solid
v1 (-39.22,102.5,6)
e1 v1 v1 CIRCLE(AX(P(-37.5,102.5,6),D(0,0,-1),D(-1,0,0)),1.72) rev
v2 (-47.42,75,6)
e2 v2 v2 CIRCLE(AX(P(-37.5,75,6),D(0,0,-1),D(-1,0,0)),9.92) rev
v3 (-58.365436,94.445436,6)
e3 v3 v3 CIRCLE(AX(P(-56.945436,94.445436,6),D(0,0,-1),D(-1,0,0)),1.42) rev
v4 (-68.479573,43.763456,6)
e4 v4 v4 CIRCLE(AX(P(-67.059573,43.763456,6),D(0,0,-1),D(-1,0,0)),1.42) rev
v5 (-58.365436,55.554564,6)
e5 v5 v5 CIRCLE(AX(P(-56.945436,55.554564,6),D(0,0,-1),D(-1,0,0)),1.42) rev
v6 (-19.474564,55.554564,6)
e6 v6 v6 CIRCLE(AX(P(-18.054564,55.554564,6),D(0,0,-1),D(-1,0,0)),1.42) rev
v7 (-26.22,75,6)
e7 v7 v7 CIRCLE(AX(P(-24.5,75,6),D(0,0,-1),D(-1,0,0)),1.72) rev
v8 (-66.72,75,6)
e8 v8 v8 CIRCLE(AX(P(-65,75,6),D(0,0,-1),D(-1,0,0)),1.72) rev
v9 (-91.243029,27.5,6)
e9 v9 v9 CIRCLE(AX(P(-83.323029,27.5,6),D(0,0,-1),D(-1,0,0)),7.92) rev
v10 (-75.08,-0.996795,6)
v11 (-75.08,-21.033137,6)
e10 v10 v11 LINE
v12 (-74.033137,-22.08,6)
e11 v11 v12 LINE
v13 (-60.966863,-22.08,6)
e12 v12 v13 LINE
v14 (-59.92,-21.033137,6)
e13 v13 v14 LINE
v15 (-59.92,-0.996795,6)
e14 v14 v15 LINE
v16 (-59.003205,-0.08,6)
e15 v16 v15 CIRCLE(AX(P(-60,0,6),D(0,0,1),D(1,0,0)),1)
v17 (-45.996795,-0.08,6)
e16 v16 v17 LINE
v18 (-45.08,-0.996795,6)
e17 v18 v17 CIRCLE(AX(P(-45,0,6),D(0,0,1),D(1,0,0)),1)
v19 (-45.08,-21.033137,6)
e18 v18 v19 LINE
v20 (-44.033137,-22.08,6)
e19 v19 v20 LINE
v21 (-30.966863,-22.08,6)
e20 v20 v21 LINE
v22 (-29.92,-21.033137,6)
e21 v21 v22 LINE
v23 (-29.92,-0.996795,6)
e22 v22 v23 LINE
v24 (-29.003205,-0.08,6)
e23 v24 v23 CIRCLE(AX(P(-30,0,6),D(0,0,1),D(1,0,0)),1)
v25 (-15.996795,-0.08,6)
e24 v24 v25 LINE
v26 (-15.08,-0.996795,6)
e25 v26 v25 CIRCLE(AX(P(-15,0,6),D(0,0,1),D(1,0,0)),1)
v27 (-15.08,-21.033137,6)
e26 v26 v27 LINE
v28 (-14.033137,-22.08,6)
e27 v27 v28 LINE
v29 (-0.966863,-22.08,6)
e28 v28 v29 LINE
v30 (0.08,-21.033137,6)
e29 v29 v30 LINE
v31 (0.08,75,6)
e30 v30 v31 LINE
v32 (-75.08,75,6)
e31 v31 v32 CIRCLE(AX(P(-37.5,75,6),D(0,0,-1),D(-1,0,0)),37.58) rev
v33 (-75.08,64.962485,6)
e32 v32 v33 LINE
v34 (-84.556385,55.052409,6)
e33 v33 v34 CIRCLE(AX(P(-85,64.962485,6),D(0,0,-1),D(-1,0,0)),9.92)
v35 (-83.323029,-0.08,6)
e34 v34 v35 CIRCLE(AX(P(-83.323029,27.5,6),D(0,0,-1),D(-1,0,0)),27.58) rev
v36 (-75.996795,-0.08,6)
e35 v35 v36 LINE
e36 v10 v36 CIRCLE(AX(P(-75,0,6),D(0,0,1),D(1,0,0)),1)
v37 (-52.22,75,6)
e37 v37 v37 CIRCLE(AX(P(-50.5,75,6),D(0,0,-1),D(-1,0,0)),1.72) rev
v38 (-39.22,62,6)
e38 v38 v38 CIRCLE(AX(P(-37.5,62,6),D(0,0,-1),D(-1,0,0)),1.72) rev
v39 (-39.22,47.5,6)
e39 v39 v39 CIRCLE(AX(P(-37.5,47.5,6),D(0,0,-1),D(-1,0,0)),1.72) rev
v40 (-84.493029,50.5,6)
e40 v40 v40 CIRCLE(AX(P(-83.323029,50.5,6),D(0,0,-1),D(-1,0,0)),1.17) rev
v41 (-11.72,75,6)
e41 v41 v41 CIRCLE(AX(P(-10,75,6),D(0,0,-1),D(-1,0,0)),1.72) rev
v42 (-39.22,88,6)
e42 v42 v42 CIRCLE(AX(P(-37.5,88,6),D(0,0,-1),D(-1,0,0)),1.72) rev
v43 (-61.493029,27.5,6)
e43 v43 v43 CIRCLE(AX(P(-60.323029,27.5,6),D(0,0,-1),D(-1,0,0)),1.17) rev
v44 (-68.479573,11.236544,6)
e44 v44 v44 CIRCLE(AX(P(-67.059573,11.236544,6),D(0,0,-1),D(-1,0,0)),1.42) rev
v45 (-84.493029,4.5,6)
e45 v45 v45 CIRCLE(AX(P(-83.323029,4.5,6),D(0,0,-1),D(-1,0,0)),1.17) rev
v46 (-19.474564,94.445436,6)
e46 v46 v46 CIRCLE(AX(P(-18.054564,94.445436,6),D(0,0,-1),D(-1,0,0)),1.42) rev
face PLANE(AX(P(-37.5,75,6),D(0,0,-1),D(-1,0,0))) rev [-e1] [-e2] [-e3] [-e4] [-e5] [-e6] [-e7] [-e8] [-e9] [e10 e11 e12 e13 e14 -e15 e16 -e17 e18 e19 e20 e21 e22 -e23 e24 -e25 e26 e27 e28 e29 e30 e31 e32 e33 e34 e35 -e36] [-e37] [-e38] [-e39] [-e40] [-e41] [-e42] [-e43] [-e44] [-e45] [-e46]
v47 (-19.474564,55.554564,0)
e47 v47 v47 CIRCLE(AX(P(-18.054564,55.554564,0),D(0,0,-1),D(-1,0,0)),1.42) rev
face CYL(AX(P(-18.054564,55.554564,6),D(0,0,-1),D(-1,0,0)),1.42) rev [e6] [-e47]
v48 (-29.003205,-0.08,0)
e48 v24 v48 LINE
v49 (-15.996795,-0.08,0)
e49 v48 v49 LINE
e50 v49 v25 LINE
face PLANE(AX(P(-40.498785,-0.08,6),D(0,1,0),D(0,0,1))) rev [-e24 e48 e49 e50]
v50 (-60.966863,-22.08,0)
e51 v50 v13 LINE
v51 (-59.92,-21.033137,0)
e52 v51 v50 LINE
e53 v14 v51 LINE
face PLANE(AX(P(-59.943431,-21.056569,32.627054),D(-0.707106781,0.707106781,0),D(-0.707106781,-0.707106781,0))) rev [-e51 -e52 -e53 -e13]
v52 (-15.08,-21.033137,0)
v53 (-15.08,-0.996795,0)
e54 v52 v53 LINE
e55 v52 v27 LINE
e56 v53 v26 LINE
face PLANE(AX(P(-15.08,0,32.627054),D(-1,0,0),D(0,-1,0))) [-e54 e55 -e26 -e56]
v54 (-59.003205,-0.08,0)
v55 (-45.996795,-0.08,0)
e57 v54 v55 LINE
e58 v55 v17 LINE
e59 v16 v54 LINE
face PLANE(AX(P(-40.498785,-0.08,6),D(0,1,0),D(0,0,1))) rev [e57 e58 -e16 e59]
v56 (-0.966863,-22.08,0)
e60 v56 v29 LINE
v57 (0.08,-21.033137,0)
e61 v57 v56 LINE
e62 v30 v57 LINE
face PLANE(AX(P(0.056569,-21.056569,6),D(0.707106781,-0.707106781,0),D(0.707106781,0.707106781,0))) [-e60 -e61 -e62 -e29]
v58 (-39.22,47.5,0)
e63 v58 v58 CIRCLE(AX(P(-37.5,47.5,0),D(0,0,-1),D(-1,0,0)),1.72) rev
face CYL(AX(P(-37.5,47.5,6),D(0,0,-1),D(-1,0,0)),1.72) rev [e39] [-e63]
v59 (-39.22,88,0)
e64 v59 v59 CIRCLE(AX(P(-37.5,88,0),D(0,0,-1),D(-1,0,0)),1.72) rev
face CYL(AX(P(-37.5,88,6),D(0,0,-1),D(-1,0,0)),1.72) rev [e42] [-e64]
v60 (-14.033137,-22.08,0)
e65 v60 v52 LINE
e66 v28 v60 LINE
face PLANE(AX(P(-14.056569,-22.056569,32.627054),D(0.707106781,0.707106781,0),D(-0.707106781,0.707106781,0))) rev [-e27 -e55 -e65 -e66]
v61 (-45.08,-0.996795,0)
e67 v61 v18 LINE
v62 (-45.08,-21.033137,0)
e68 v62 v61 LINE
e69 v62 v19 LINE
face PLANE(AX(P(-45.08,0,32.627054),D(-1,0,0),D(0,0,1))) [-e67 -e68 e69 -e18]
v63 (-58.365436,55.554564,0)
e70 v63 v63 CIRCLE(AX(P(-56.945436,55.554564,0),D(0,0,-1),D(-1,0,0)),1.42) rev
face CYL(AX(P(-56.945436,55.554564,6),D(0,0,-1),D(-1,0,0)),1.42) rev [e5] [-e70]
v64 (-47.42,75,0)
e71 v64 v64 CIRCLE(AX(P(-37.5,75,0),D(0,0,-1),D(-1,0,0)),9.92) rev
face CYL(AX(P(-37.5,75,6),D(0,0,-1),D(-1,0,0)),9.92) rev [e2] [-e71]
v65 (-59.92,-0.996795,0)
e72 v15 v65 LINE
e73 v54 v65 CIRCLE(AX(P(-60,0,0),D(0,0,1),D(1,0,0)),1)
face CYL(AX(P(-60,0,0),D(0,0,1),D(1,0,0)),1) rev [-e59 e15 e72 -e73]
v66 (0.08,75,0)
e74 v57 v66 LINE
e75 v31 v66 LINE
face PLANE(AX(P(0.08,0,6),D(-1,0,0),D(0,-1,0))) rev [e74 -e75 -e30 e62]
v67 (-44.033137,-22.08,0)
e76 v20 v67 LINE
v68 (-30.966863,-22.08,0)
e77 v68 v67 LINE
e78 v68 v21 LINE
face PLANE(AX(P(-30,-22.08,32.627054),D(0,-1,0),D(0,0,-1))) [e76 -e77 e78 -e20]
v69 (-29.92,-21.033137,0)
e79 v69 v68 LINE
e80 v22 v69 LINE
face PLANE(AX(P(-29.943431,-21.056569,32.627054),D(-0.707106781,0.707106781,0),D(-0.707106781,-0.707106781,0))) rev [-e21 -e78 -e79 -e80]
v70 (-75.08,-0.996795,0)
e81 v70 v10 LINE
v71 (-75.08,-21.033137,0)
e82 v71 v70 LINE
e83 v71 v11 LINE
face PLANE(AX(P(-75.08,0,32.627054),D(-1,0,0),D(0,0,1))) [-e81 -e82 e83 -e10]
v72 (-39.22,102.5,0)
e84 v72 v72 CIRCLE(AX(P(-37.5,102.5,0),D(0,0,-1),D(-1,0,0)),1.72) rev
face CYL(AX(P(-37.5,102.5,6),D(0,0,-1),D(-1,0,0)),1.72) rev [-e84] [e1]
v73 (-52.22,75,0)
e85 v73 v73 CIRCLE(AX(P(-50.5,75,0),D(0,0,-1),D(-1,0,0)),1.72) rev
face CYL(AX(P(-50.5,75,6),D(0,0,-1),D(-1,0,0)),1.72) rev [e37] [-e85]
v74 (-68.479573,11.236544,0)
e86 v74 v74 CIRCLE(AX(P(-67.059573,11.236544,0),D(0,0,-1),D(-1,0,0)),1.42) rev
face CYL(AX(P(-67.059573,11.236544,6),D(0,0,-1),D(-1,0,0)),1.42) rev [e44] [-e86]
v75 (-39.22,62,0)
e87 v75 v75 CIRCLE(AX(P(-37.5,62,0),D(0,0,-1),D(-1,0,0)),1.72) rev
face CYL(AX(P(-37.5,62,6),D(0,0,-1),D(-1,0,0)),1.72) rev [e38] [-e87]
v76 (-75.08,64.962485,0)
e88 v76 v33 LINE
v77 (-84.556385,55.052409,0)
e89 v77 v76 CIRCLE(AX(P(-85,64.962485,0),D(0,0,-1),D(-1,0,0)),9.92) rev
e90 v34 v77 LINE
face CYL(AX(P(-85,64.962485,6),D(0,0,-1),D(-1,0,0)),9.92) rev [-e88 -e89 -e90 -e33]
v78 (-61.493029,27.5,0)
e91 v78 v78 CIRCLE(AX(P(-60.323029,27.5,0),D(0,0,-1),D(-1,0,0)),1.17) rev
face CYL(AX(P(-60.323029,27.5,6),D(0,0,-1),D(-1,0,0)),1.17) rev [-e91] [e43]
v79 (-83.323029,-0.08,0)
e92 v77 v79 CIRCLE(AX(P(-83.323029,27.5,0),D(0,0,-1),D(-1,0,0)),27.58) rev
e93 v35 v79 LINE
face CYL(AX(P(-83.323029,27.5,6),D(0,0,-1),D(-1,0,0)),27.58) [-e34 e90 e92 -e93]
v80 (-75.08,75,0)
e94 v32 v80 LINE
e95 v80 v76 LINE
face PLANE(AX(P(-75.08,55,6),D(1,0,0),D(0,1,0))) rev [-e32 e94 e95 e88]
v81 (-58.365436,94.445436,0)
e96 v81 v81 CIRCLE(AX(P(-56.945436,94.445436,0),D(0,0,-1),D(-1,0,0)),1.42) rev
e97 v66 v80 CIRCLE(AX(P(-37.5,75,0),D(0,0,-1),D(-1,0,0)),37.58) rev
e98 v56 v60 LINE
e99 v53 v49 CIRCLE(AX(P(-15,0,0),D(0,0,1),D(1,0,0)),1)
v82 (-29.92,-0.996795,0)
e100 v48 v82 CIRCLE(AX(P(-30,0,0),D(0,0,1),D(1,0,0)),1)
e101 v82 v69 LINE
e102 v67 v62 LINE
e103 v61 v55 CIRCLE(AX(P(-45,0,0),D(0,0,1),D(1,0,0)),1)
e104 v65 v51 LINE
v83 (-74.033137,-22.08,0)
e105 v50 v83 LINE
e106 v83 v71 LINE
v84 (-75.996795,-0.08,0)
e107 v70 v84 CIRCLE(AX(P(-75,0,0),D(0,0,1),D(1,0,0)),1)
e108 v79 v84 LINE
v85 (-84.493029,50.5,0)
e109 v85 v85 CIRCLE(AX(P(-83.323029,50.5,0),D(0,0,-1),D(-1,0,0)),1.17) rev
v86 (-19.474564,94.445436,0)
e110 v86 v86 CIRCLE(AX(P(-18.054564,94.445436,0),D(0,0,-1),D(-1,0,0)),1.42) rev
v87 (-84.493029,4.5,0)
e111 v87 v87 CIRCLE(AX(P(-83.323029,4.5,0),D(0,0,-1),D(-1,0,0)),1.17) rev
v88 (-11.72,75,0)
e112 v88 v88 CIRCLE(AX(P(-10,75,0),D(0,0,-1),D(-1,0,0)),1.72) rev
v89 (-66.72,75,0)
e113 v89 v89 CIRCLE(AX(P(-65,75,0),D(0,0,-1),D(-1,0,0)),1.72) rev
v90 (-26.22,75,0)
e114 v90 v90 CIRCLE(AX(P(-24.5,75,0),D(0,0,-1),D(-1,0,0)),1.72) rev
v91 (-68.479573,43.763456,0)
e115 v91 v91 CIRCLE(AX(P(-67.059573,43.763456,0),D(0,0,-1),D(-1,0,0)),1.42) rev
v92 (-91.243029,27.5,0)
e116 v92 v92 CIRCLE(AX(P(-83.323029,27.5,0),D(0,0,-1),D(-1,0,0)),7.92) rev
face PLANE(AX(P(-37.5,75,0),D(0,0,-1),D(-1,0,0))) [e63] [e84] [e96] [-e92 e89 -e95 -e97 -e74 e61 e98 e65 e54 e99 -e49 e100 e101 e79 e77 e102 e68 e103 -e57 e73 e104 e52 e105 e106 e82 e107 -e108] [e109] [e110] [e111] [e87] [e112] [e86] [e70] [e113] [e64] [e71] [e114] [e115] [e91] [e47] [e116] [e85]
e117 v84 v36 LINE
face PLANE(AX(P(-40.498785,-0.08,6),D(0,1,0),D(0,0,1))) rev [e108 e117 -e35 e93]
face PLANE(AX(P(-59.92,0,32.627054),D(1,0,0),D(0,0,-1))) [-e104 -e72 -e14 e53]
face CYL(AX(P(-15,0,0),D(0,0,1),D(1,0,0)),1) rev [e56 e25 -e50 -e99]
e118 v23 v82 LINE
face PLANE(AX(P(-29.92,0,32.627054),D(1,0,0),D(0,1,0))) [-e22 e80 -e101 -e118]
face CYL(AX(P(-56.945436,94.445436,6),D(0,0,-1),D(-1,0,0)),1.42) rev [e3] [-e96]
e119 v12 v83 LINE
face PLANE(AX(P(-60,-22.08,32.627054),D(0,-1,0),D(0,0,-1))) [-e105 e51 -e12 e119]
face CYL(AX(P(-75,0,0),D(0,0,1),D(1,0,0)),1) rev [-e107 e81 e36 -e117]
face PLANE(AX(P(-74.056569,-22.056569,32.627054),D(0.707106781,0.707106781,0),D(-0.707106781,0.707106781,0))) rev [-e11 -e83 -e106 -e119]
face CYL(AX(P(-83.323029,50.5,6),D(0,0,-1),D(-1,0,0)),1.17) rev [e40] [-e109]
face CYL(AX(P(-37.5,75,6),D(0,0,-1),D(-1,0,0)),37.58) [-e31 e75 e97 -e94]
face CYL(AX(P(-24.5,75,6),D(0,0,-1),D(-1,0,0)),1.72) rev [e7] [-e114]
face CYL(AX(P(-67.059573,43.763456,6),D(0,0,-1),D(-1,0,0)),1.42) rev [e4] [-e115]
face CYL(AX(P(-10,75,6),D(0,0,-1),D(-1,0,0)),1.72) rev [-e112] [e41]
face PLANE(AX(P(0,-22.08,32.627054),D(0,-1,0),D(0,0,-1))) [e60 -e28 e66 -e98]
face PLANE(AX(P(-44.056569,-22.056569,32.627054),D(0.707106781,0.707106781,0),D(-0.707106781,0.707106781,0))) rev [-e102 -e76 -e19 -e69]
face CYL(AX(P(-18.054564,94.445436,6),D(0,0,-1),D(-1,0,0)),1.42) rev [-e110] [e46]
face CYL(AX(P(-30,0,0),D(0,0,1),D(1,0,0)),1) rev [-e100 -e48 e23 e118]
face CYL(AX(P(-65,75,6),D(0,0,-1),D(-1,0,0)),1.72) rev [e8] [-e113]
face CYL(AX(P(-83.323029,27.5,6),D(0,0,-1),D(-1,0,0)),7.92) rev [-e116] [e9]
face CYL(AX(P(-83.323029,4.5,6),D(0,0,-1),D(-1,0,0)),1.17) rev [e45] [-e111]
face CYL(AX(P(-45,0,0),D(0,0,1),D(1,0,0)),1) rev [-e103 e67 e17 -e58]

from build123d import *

# Parameters (mm, degrees)
SKETCH1_R               = 8
SKETCH1_R_2             = 10
SKETCH1_R_3             = 1.25
SKETCH1_R_4             = 1.5
SKETCH1_R_5             = 1.8
BOSS_EXTRUDE1_DEPTH     = 6
FILLET1_R               = 10
SKETCH2_W               = 15
SKETCH2_H               = 22
BOSS_EXTRUDE2_DEPTH     = 6
SKETCH3_R               = 1
CUT_EXTRUDE1_DEPTH      = 159.031622895
CHAMFER1_SIZE           = 1
MOVE_FACE1_OUTLINE_R    = 8
MOVE_FACE1_OUTLINE_R_2  = 7.92
MOVE_FACE1_OUTLINE_R_3  = 10
MOVE_FACE1_OUTLINE_R_4  = 9.92
MOVE_FACE1_OUTLINE_R_5  = 1.25
MOVE_FACE1_OUTLINE_R_6  = 1.17
MOVE_FACE1_OUTLINE_R_7  = 1.5
MOVE_FACE1_OUTLINE_R_8  = 1.42
MOVE_FACE1_OUTLINE_R_9  = 1.8
MOVE_FACE1_OUTLINE_R_10 = 1.72
MOVE_FACE1_DEPTH        = 6


# Read off the part's stored shape, not the designer's step: Move Face1
with BuildPart() as part:
    # Sketch1 → Boss-Extrude1 (new body)
    with BuildSketch(Plane.XY):
        with BuildLine():
            Line((-40.498784978, 0), (0, 0))
            Line((0, 0), (0, 75))
            ThreePointArc((0, 75), (-37.5, 112.5), (-75, 75))
            Line((-75, 75), (-75, 55))
            Line((-75, 55), (-83.323029145, 55))
            ThreePointArc((-83.323029145, 55), (-110.823029145, 27.5), (-83.323029145, 0))
            Line((-83.323029145, 0), (-40.498784978, 0))
        make_face()
        with Locations((-83.323029145, 27.5)):
            Circle(SKETCH1_R, mode=Mode.SUBTRACT)
        with Locations((-37.5, 75)):
            Circle(SKETCH1_R_2, mode=Mode.SUBTRACT)
        with Locations((-83.323029145, 50.5)):
            Circle(SKETCH1_R_3, mode=Mode.SUBTRACT)
        with Locations((-67.059573177, 43.763455967)):
            Circle(SKETCH1_R_4, mode=Mode.SUBTRACT)
        with Locations((-60.323029145, 27.5)):
            Circle(SKETCH1_R_3, mode=Mode.SUBTRACT)
        with Locations((-67.059573177, 11.236544033)):
            Circle(SKETCH1_R_4, mode=Mode.SUBTRACT)
        with Locations((-83.323029145, 4.5)):
            Circle(SKETCH1_R_3, mode=Mode.SUBTRACT)
        with Locations((-37.5, 102.5)):
            Circle(SKETCH1_R_5, mode=Mode.SUBTRACT)
        with Locations((-65, 75)):
            Circle(SKETCH1_R_5, mode=Mode.SUBTRACT)
        with Locations((-10, 75)):
            Circle(SKETCH1_R_5, mode=Mode.SUBTRACT)
        with Locations((-37.5, 47.5)):
            Circle(SKETCH1_R_5, mode=Mode.SUBTRACT)
        with Locations((-56.945436483, 94.445436483)):
            Circle(SKETCH1_R_4, mode=Mode.SUBTRACT)
        with Locations((-18.054563517, 94.445436483)):
            Circle(SKETCH1_R_4, mode=Mode.SUBTRACT)
        with Locations((-18.054563517, 55.554563517)):
            Circle(SKETCH1_R_4, mode=Mode.SUBTRACT)
        with Locations((-56.945436483, 55.554563517)):
            Circle(SKETCH1_R_4, mode=Mode.SUBTRACT)
        with Locations((-37.5, 88)):
            Circle(SKETCH1_R_5, mode=Mode.SUBTRACT)
        with Locations((-24.5, 75)):
            Circle(SKETCH1_R_5, mode=Mode.SUBTRACT)
        with Locations((-37.5, 62)):
            Circle(SKETCH1_R_5, mode=Mode.SUBTRACT)
        with Locations((-50.5, 75)):
            Circle(SKETCH1_R_5, mode=Mode.SUBTRACT)
    extrude(amount=BOSS_EXTRUDE1_DEPTH)

    # Fillet1
    fillet1_edges = [part.edges().sort_by_distance(p)[0] for p in [
        (-75, 55, 3),
    ]]
    fillet(fillet1_edges, radius=FILLET1_R)

    # Sketch2 → Boss-Extrude2 (add)
    with BuildSketch(Plane(origin=(0, 0, 0), x_dir=(-1, 0, 0), z_dir=(0, 0, -1))):
        with Locations((7.5, -11)):
            Rectangle(SKETCH2_W, SKETCH2_H)
        with Locations((37.5, -11)):
            Rectangle(SKETCH2_W, SKETCH2_H)
        with Locations((67.5, -11)):
            Rectangle(SKETCH2_W, SKETCH2_H)
    extrude(amount=-BOSS_EXTRUDE2_DEPTH)

    # Sketch3 → Cut-Extrude1 (cut, through all)
    with BuildSketch(Plane.XY.offset(6)):
        with Locations((-75, 0)):
            Circle(SKETCH3_R)
        with Locations((-60, 0)):
            Circle(SKETCH3_R)
        with Locations((-45, 0)):
            Circle(SKETCH3_R)
        with Locations((-30, 0)):
            Circle(SKETCH3_R)
        with Locations((-15, 0)):
            Circle(SKETCH3_R)
    extrude(amount=-CUT_EXTRUDE1_DEPTH, mode=Mode.SUBTRACT)

    # Chamfer1
    chamfer1_edges = [part.edges().sort_by_distance(p)[0] for p in [
        (0, -22, 3),
        (-15, -22, 3),
        (-30, -22, 3),
        (-45, -22, 3),
        (-60, -22, 3),
        (-75, -22, 3),
    ]]
    chamfer(chamfer1_edges, length=CHAMFER1_SIZE)

    # Move Face1 outline → Move Face1 (add)
    # profile 1 of 24: a face of its own
    with BuildSketch(Plane.XY):
        with BuildLine():
            Line((-59.003205136, -0.08), (-45.996794864, -0.08))
            ThreePointArc((-45.996794864, -0.08), (-45.999198395, -0.04003209), (-46, 0))
            Line((-46, 0), (-59, 0))
            ThreePointArc((-59, 0), (-59.000801605, -0.04003209), (-59.003205136, -0.08))
        make_face()
    # profile 2 of 24: a face of its own
    with BuildSketch(Plane.XY):
        with BuildLine():
            Line((-45, -21), (-45, -1))
            ThreePointArc((-45, -1), (-45.04003209, -0.999198395), (-45.08, -0.996794864))
            Line((-45.08, -0.996794864), (-45.08, -21.033137085))
            Line((-45.08, -21.033137085), (-44.033137085, -22.08))
            Line((-44.033137085, -22.08), (-30.966862915, -22.08))
            Line((-30.966862915, -22.08), (-29.92, -21.033137085))
            Line((-29.92, -21.033137085), (-29.92, -0.996794864))
            ThreePointArc((-29.92, -0.996794864), (-29.95996791, -0.999198395), (-30, -1))
            Line((-30, -1), (-30, -21))
            Line((-30, -21), (-31, -22))
            Line((-31, -22), (-44, -22))
            Line((-44, -22), (-45, -21))
        make_face()
    # profile 3 of 24: a face of its own
    with BuildSketch(Plane.XY):
        with BuildLine():
            ThreePointArc((-59.92, -0.996794864), (-59.95996791, -0.999198395), (-60, -1))
            Line((-60, -1), (-60, -21))
            Line((-60, -21), (-61, -22))
            Line((-61, -22), (-74, -22))
            Line((-74, -22), (-75, -21))
            Line((-75, -21), (-75, -1))
            ThreePointArc((-75, -1), (-75.04003209, -0.999198395), (-75.08, -0.996794864))
            Line((-75.08, -0.996794864), (-75.08, -21.033137085))
            Line((-75.08, -21.033137085), (-74.033137085, -22.08))
            Line((-74.033137085, -22.08), (-60.966862915, -22.08))
            Line((-60.966862915, -22.08), (-59.92, -21.033137085))
            Line((-59.92, -21.033137085), (-59.92, -0.996794864))
        make_face()
    # profile 4 of 24: a face of its own
    with BuildSketch(Plane.XY):
        with BuildLine():
            Line((-16, 0), (-29, 0))
            ThreePointArc((-29, 0), (-29.000801605, -0.04003209), (-29.003205136, -0.08))
            Line((-29.003205136, -0.08), (-15.996794864, -0.08))
            ThreePointArc((-15.996794864, -0.08), (-15.999198395, -0.04003209), (-16, 0))
        make_face()
    # profile 5 of 24: a face of its own
    with BuildSketch(Plane.XY):
        with BuildLine():
            ThreePointArc((-75.996794864, -0.08), (-75.999198395, -0.04003209), (-76, 0))
            Line((-76, 0), (-83.323029145, 0))
            ThreePointArc((-83.323029145, 0), (-110.816150501, 26.884956844), (-84.552807772, 54.972488867))
            ThreePointArc((-84.552807772, 54.972488867), (-77.772555006, 58.051331596), (-75, 64.962484818))
            Line((-75, 64.962484818), (-75, 75))
            ThreePointArc((-75, 75), (-37.5, 112.5), (0, 75))
            Line((0, 75), (0, -21))
            Line((0, -21), (-1, -22))
            Line((-1, -22), (-14, -22))
            Line((-14, -22), (-15, -21))
            Line((-15, -21), (-15, -1))
            ThreePointArc((-15, -1), (-15.04003209, -0.999198395), (-15.08, -0.996794864))
            Line((-15.08, -0.996794864), (-15.08, -21.033137085))
            Line((-15.08, -21.033137085), (-14.033137085, -22.08))
            Line((-14.033137085, -22.08), (-0.966862915, -22.08))
            Line((-0.966862915, -22.08), (0.08, -21.033137085))
            Line((0.08, -21.033137085), (0.08, 75))
            ThreePointArc((0.08, 75), (-37.5, 112.58), (-75.08, 75))
            Line((-75.08, 75), (-75.08, 64.962484818))
            ThreePointArc((-75.08, 64.962484818), (-77.830374566, 58.106620822), (-84.55638531, 55.052408834))
            ThreePointArc((-84.55638531, 55.052408834), (-110.896130491, 26.883167628), (-83.323029145, -0.08))
            Line((-83.323029145, -0.08), (-75.996794864, -0.08))
        make_face()
    # profile 6 of 24: a face of its own
    with BuildSketch(Plane.XY):
        with Locations((-83.323029145, 27.5)):
            Circle(MOVE_FACE1_OUTLINE_R)
        with Locations((-83.323029145, 27.5)):
            Circle(MOVE_FACE1_OUTLINE_R_2, mode=Mode.SUBTRACT)
    # profile 7 of 24: a face of its own
    with BuildSketch(Plane.XY):
        with Locations((-37.5, 75)):
            Circle(MOVE_FACE1_OUTLINE_R_3)
        with Locations((-37.5, 75)):
            Circle(MOVE_FACE1_OUTLINE_R_4, mode=Mode.SUBTRACT)
    # profile 8 of 24: a face of its own
    with BuildSketch(Plane.XY):
        with Locations((-83.323029145, 50.5)):
            Circle(MOVE_FACE1_OUTLINE_R_5)
        with Locations((-83.323029145, 50.5)):
            Circle(MOVE_FACE1_OUTLINE_R_6, mode=Mode.SUBTRACT)
    # profile 9 of 24: a face of its own
    with BuildSketch(Plane.XY):
        with Locations((-67.059573177, 43.763455967)):
            Circle(MOVE_FACE1_OUTLINE_R_7)
        with Locations((-67.059573177, 43.763455967)):
            Circle(MOVE_FACE1_OUTLINE_R_8, mode=Mode.SUBTRACT)
    # profile 10 of 24: a face of its own
    with BuildSketch(Plane.XY):
        with Locations((-37.5, 102.5)):
            Circle(MOVE_FACE1_OUTLINE_R_9)
        with Locations((-37.5, 102.5)):
            Circle(MOVE_FACE1_OUTLINE_R_10, mode=Mode.SUBTRACT)
    # profile 11 of 24: a face of its own
    with BuildSketch(Plane.XY):
        with Locations((-60.323029145, 27.5)):
            Circle(MOVE_FACE1_OUTLINE_R_5)
        with Locations((-60.323029145, 27.5)):
            Circle(MOVE_FACE1_OUTLINE_R_6, mode=Mode.SUBTRACT)
    # profile 12 of 24: a face of its own
    with BuildSketch(Plane.XY):
        with Locations((-67.059573177, 11.236544033)):
            Circle(MOVE_FACE1_OUTLINE_R_7)
        with Locations((-67.059573177, 11.236544033)):
            Circle(MOVE_FACE1_OUTLINE_R_8, mode=Mode.SUBTRACT)
    # profile 13 of 24: a face of its own
    with BuildSketch(Plane.XY):
        with Locations((-83.323029145, 4.5)):
            Circle(MOVE_FACE1_OUTLINE_R_5)
        with Locations((-83.323029145, 4.5)):
            Circle(MOVE_FACE1_OUTLINE_R_6, mode=Mode.SUBTRACT)
    # profile 14 of 24: a face of its own
    with BuildSketch(Plane.XY):
        with Locations((-65, 75)):
            Circle(MOVE_FACE1_OUTLINE_R_9)
        with Locations((-65, 75)):
            Circle(MOVE_FACE1_OUTLINE_R_10, mode=Mode.SUBTRACT)
    # profile 15 of 24: a face of its own
    with BuildSketch(Plane.XY):
        with Locations((-10, 75)):
            Circle(MOVE_FACE1_OUTLINE_R_9)
        with Locations((-10, 75)):
            Circle(MOVE_FACE1_OUTLINE_R_10, mode=Mode.SUBTRACT)
    # profile 16 of 24: a face of its own
    with BuildSketch(Plane.XY):
        with Locations((-37.5, 47.5)):
            Circle(MOVE_FACE1_OUTLINE_R_9)
        with Locations((-37.5, 47.5)):
            Circle(MOVE_FACE1_OUTLINE_R_10, mode=Mode.SUBTRACT)
    # profile 17 of 24: a face of its own
    with BuildSketch(Plane.XY):
        with Locations((-56.945436483, 94.445436483)):
            Circle(MOVE_FACE1_OUTLINE_R_7)
        with Locations((-56.945436483, 94.445436483)):
            Circle(MOVE_FACE1_OUTLINE_R_8, mode=Mode.SUBTRACT)
    # profile 18 of 24: a face of its own
    with BuildSketch(Plane.XY):
        with Locations((-37.5, 88)):
            Circle(MOVE_FACE1_OUTLINE_R_9)
        with Locations((-37.5, 88)):
            Circle(MOVE_FACE1_OUTLINE_R_10, mode=Mode.SUBTRACT)
    # profile 19 of 24: a face of its own
    with BuildSketch(Plane.XY):
        with Locations((-18.054563517, 94.445436483)):
            Circle(MOVE_FACE1_OUTLINE_R_7)
        with Locations((-18.054563517, 94.445436483)):
            Circle(MOVE_FACE1_OUTLINE_R_8, mode=Mode.SUBTRACT)
    # profile 20 of 24: a face of its own
    with BuildSketch(Plane.XY):
        with Locations((-18.054563517, 55.554563517)):
            Circle(MOVE_FACE1_OUTLINE_R_7)
        with Locations((-18.054563517, 55.554563517)):
            Circle(MOVE_FACE1_OUTLINE_R_8, mode=Mode.SUBTRACT)
    # profile 21 of 24: a face of its own
    with BuildSketch(Plane.XY):
        with Locations((-56.945436483, 55.554563517)):
            Circle(MOVE_FACE1_OUTLINE_R_7)
        with Locations((-56.945436483, 55.554563517)):
            Circle(MOVE_FACE1_OUTLINE_R_8, mode=Mode.SUBTRACT)
    # profile 22 of 24: a face of its own
    with BuildSketch(Plane.XY):
        with Locations((-24.5, 75)):
            Circle(MOVE_FACE1_OUTLINE_R_9)
        with Locations((-24.5, 75)):
            Circle(MOVE_FACE1_OUTLINE_R_10, mode=Mode.SUBTRACT)
    # profile 23 of 24: a face of its own
    with BuildSketch(Plane.XY):
        with Locations((-37.5, 62)):
            Circle(MOVE_FACE1_OUTLINE_R_9)
        with Locations((-37.5, 62)):
            Circle(MOVE_FACE1_OUTLINE_R_10, mode=Mode.SUBTRACT)
    # profile 24 of 24: a face of its own
    with BuildSketch(Plane.XY):
        with Locations((-50.5, 75)):
            Circle(MOVE_FACE1_OUTLINE_R_9)
        with Locations((-50.5, 75)):
            Circle(MOVE_FACE1_OUTLINE_R_10, mode=Mode.SUBTRACT)
    extrude(amount=MOVE_FACE1_DEPTH)


solid = part.part
